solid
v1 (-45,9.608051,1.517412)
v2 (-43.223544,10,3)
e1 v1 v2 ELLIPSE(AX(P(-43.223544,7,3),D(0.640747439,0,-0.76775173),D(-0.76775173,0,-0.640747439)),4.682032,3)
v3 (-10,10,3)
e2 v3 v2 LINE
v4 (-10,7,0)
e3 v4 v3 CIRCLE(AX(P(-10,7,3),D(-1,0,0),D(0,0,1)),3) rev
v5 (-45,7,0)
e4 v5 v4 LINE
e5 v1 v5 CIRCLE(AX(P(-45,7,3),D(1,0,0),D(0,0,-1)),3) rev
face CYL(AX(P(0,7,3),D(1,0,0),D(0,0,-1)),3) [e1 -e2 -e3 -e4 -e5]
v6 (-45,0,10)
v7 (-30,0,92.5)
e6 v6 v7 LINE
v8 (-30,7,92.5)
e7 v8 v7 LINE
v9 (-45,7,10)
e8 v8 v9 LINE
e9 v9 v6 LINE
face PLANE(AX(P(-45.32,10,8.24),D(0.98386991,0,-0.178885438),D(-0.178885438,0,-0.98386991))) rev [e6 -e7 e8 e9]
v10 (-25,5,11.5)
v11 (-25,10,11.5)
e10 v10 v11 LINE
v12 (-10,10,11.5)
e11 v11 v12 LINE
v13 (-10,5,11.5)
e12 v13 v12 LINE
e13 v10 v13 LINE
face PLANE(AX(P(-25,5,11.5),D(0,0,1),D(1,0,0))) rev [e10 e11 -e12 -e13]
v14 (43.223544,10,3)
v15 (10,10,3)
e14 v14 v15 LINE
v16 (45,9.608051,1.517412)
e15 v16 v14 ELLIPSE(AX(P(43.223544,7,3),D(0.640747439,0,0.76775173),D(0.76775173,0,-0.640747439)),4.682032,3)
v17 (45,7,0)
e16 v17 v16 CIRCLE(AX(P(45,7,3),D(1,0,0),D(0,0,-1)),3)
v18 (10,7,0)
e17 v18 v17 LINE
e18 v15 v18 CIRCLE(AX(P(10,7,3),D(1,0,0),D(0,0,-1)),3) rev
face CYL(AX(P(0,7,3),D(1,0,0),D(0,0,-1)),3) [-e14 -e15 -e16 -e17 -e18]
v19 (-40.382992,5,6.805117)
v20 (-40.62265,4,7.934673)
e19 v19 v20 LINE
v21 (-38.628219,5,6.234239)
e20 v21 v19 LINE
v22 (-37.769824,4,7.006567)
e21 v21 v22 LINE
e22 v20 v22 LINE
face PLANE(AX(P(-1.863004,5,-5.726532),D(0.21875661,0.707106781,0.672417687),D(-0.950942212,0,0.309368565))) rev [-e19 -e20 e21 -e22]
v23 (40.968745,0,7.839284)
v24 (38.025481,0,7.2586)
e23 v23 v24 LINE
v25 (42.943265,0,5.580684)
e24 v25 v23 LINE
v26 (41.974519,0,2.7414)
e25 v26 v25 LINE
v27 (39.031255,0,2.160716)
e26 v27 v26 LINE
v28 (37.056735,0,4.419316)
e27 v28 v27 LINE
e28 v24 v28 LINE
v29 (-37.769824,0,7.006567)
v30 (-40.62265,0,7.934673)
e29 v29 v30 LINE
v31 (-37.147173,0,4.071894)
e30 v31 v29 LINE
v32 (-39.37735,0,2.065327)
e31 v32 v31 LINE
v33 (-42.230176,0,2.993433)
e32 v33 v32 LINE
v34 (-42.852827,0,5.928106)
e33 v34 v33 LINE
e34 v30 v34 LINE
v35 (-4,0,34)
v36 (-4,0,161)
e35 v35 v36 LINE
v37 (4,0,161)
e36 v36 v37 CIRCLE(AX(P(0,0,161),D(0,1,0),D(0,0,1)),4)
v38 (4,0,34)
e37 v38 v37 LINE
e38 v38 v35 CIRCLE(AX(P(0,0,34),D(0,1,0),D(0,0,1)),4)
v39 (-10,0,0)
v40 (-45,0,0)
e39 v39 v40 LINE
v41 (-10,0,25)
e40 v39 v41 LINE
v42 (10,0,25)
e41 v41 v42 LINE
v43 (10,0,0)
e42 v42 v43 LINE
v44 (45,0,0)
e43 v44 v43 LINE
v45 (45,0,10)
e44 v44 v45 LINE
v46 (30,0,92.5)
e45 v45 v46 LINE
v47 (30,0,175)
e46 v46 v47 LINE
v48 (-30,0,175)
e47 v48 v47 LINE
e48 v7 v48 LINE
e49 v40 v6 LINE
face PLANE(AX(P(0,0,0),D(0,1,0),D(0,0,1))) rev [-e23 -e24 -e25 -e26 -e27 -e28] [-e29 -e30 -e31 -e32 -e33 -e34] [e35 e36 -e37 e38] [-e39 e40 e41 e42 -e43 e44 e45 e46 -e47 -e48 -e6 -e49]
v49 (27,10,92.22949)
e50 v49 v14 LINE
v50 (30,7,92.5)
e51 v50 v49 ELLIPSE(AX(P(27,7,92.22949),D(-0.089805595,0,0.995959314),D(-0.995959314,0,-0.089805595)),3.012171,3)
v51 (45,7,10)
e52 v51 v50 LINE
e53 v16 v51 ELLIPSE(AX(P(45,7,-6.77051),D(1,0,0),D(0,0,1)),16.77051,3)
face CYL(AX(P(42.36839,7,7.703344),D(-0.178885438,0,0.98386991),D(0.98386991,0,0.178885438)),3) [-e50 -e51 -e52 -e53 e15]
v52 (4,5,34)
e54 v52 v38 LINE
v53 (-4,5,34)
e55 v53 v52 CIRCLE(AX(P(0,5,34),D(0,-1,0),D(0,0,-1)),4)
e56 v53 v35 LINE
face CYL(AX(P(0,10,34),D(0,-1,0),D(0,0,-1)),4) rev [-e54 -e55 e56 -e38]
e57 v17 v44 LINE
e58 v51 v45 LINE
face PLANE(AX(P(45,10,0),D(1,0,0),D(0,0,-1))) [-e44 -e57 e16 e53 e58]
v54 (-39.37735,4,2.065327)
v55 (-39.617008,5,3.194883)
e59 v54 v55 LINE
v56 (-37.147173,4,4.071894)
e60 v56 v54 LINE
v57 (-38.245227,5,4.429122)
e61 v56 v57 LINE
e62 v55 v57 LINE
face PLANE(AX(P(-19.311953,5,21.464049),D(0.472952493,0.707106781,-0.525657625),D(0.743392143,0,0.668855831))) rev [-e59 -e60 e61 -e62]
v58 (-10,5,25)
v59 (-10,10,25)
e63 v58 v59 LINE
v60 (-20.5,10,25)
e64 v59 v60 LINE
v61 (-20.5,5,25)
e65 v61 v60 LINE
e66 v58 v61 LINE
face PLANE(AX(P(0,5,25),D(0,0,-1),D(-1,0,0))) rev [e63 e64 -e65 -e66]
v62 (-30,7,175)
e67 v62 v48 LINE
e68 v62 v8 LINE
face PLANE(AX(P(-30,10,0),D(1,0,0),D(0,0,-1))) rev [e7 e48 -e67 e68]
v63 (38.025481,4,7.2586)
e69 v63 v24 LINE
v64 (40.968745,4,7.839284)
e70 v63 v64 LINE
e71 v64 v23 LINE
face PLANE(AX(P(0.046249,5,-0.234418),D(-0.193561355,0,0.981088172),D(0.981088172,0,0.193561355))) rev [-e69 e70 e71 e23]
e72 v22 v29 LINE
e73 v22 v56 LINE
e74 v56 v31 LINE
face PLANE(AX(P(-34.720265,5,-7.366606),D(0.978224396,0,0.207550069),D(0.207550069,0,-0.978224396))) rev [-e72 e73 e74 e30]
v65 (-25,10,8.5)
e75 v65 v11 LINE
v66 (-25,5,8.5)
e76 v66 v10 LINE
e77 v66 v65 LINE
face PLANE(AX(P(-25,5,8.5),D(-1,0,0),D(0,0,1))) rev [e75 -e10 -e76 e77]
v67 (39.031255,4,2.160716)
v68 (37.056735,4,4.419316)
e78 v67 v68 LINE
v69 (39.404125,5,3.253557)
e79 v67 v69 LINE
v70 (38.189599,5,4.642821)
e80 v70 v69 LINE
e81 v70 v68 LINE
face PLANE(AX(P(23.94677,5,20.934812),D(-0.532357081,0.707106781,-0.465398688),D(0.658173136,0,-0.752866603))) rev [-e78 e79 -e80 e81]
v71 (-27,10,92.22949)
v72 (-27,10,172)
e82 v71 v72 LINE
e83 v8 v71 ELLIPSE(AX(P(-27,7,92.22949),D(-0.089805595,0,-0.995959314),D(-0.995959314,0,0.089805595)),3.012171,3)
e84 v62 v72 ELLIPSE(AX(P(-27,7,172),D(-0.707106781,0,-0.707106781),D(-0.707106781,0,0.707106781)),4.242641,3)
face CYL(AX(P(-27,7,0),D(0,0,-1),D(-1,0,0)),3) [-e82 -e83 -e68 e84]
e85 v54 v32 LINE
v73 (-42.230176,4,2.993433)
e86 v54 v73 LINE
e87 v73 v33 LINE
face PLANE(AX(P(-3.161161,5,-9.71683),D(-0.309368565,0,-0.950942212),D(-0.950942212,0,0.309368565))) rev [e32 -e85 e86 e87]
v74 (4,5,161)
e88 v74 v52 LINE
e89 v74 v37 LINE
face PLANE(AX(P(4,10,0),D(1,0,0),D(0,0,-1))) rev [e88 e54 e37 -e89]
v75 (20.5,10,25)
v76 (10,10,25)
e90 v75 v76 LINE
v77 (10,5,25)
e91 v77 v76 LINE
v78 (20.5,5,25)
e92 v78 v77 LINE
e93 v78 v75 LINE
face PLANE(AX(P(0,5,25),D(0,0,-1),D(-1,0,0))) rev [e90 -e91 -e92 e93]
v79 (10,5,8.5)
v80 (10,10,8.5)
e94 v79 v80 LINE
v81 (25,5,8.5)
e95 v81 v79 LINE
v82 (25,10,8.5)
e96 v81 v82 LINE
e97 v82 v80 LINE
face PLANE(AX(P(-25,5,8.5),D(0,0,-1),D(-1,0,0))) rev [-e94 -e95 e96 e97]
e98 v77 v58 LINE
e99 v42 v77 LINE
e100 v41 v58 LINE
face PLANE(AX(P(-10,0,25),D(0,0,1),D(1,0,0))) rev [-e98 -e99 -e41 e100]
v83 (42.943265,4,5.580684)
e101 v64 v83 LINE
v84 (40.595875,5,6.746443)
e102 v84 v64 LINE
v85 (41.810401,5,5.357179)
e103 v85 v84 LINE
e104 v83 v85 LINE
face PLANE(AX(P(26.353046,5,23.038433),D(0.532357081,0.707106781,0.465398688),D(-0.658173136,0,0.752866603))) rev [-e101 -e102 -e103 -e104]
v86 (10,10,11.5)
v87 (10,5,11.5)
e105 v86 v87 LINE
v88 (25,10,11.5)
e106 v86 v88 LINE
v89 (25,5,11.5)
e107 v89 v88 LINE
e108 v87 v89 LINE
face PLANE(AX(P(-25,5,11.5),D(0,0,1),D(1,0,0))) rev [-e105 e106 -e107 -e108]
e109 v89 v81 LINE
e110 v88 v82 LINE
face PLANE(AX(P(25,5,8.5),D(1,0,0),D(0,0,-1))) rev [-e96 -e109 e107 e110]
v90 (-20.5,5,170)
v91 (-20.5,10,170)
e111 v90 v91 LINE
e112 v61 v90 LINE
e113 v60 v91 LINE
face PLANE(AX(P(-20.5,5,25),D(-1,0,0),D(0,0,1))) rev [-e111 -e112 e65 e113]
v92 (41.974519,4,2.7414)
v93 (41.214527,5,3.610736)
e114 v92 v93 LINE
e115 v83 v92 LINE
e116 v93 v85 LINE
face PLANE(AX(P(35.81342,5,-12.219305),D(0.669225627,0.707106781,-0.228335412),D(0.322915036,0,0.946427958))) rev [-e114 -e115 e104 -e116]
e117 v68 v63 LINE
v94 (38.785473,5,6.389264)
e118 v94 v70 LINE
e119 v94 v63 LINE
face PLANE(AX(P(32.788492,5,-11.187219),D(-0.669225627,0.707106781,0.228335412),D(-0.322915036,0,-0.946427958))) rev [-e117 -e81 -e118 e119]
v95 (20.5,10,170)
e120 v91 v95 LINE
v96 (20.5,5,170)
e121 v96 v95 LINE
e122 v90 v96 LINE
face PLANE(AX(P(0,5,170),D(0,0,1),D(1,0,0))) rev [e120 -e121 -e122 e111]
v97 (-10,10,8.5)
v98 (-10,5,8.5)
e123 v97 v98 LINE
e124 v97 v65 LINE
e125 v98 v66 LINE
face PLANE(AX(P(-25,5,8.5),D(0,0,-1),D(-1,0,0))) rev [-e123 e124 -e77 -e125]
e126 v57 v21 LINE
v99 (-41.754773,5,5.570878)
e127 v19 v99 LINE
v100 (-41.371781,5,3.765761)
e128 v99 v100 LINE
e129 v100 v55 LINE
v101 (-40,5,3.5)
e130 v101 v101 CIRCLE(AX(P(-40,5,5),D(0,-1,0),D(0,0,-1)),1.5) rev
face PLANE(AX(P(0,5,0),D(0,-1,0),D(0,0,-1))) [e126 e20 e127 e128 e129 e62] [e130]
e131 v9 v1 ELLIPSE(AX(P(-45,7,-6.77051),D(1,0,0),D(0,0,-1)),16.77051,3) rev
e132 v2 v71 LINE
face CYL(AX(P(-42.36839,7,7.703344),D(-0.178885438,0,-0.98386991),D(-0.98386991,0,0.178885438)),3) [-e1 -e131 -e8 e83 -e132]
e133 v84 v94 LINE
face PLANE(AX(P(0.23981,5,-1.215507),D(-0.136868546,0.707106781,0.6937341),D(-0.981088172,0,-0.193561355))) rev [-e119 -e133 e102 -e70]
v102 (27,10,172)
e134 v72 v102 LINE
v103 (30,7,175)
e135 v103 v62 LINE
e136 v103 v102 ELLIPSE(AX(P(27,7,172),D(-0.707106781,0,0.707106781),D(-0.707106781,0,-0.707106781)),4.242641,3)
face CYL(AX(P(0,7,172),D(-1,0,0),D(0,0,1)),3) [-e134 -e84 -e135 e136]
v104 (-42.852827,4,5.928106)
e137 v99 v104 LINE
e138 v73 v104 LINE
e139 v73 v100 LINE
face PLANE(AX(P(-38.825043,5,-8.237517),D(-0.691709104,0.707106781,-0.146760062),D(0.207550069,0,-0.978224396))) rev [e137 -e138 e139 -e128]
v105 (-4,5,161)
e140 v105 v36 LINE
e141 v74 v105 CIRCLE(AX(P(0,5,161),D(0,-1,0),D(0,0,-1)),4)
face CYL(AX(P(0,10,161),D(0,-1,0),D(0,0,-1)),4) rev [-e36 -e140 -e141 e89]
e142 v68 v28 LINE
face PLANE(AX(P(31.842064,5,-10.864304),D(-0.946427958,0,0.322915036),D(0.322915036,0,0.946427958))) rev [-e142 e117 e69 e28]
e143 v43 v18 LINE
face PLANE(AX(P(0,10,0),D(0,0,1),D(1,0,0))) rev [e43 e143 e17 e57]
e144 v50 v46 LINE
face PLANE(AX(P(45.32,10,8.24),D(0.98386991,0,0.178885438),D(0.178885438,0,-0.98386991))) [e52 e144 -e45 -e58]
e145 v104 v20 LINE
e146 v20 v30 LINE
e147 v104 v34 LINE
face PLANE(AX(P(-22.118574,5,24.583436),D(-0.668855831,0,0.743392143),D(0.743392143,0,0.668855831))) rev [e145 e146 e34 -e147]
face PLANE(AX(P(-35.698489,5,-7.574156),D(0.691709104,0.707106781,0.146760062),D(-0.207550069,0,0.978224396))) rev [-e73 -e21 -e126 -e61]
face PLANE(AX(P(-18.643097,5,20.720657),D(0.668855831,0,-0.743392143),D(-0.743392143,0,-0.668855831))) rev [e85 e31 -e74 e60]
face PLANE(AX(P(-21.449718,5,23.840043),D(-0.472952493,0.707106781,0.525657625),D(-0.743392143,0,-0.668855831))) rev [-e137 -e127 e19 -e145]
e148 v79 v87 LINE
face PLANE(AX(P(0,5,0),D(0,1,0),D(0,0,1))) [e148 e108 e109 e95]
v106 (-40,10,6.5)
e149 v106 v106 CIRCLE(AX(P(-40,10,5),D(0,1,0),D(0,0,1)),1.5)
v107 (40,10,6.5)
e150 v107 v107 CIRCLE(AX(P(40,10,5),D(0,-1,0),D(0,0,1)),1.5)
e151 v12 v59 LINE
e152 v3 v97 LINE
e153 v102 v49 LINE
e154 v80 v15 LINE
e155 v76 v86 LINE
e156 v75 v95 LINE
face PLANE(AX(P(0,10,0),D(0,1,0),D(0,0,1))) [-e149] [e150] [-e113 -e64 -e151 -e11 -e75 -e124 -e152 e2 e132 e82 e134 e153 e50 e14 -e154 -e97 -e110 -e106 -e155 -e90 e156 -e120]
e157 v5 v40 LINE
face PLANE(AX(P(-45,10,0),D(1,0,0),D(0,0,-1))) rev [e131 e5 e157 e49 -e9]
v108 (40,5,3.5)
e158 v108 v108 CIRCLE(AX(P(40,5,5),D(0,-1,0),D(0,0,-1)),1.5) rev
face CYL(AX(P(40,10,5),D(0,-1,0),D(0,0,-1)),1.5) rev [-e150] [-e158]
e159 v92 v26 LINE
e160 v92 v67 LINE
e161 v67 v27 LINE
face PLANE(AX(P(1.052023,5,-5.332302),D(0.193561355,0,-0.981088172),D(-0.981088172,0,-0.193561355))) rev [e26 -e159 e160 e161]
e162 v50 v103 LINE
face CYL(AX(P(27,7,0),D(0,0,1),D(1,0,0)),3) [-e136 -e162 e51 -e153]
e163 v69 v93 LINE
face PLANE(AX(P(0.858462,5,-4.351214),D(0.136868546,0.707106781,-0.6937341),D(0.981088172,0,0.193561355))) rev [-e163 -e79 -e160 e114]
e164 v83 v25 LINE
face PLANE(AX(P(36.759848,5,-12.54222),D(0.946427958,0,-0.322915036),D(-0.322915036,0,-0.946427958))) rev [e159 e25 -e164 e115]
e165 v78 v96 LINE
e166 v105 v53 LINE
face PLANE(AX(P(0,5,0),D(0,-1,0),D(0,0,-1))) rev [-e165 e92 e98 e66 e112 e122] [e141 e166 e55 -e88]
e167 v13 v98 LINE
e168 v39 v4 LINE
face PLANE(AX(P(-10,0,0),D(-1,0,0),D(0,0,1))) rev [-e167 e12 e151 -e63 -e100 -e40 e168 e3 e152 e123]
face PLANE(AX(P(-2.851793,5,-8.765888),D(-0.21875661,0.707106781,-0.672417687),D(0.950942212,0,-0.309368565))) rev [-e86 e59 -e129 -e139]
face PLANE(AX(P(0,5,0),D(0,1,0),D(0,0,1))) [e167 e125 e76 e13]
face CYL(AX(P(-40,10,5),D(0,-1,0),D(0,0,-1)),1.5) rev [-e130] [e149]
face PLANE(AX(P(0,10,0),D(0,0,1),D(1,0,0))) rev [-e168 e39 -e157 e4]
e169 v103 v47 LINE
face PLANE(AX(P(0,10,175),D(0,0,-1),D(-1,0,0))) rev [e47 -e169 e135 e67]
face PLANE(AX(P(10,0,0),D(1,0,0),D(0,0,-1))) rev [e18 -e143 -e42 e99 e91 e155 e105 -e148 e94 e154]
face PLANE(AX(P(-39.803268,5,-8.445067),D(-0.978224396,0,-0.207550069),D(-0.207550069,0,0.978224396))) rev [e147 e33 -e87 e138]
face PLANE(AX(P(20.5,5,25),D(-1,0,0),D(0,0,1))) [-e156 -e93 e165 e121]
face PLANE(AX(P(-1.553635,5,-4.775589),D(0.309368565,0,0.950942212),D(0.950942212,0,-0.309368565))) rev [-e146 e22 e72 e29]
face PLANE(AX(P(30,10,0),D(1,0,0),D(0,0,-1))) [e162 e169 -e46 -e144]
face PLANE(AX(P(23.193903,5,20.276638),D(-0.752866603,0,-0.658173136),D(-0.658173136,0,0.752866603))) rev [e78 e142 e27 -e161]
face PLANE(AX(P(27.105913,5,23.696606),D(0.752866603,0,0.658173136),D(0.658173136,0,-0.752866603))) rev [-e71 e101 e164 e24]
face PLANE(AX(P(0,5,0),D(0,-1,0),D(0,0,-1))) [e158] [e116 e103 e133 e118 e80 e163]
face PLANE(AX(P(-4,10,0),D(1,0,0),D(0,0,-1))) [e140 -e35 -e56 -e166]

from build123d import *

# Parameters (mm, degrees)
SKETCH1_R           = 1.5
BOSS_EXTRUDE1_DEPTH = 10
SKETCH2_W           = 20.5
SKETCH2_H           = 145
CUT_EXTRUDE1_DEPTH  = 5
SKETCH3_W           = 20
SKETCH3_H           = 25
CUT_EXTRUDE2_DEPTH  = 181.969610709
SKETCH4_W           = 50
SKETCH4_H           = 3
CUT_EXTRUDE3_DEPTH  = 5
FILLET1_R           = 3
SKETCH6_R           = 1.5
CUT_EXTRUDE4_DEPTH  = 5
CHAMFER2_SIZE       = 1


with BuildPart() as part:
    # Sketch1 → Boss-Extrude1 (new body)
    with BuildSketch(Plane(origin=(0, 0, 0), x_dir=(1, 0, 0), z_dir=(0, 1, 0))):
        with BuildLine():
            Line((0, -30), (0, 0))
            Line((0, 0), (-45, 0))
            Line((-45, 0), (-45, -10))
            Line((-45, -10), (-30, -92.5))
            Line((-30, -92.5), (-30, -175))
            Line((-30, -175), (0, -175))
            Line((0, -175), (0, -165))
            ThreePointArc((0, -165), (-2.828427125, -163.828427125), (-4, -161))
            Line((-4, -161), (-4, -34))
            ThreePointArc((-4, -34), (-2.828427125, -31.171572875), (0, -30))
        make_face()
        with Locations(Location((-40, -5, 0), (0, 0, 270))):
            Circle(SKETCH1_R, mode=Mode.SUBTRACT)
    boss_extrude1 = extrude(amount=BOSS_EXTRUDE1_DEPTH)

    # Sketch2 → Cut-Extrude1 (cut)
    with BuildSketch(Plane(origin=(0, 10, 0), x_dir=(1, 0, 0), z_dir=(0, 1, 0))):
        with Locations((-10.25, -97.5)):
            Rectangle(SKETCH2_W, SKETCH2_H)
    cut_extrude1 = extrude(amount=-CUT_EXTRUDE1_DEPTH, mode=Mode.SUBTRACT)

    # Mirror1: Boss-Extrude1, Cut-Extrude1 across plane
    add(boss_extrude1.mirror(Plane(origin=(0, 0, 0), x_dir=(0, 0, 1), z_dir=(1, 0, 0))))
    add(cut_extrude1.mirror(Plane(origin=(0, 0, 0), x_dir=(0, 0, 1), z_dir=(1, 0, 0))), mode=Mode.SUBTRACT)

    # Sketch3 → Cut-Extrude2 (cut, through all)
    with BuildSketch(Plane(origin=(0, 10, 0), x_dir=(1, 0, 0), z_dir=(0, 1, 0))):
        with Locations((0, -12.5)):
            Rectangle(SKETCH3_W, SKETCH3_H)
    extrude(amount=-CUT_EXTRUDE2_DEPTH, mode=Mode.SUBTRACT)

    # Sketch4 → Cut-Extrude3 (cut)
    with BuildSketch(Plane(origin=(0, 10, 0), x_dir=(1, 0, 0), z_dir=(0, 1, 0))):
        with Locations((0, -10)):
            Rectangle(SKETCH4_W, SKETCH4_H)
    extrude(amount=-CUT_EXTRUDE3_DEPTH, mode=Mode.SUBTRACT)

    # Fillet1
    # the kernel refuses this fillet: 3 mm, written as the material it takes off along each edge
    with BuildSketch(Plane(origin=(-63, 10, 0), x_dir=(0, -1, 0), z_dir=(1, 0, 0)), Plane(origin=(-8, 10, 0), x_dir=(0, -1, 0), z_dir=(1, 0, 0))) as fillet1_piece_1:
        with BuildLine():
            CenterArc((FILLET1_R, -FILLET1_R), FILLET1_R, 90, 90)
            Line((0, -FILLET1_R), (-FILLET1_R * 0.02, -FILLET1_R))
            Line((-FILLET1_R * 0.02, -FILLET1_R), (-FILLET1_R * 0.02, FILLET1_R * 0.02))
            Line((-FILLET1_R * 0.02, FILLET1_R * 0.02), (FILLET1_R, FILLET1_R * 0.02))
            Line((FILLET1_R, FILLET1_R * 0.02), (FILLET1_R, 0))
        make_face()
    extrude(amount=71, mode=Mode.SUBTRACT)
    with BuildSketch(Plane(origin=(-48.219937888, 10, -7.709658382), x_dir=(0, -1, 0), z_dir=(0.1788854381999831, 0, 0.9838699100999075))) as fillet1_piece_2_section:
        with BuildLine():
            CenterArc((FILLET1_R, FILLET1_R), FILLET1_R, 180, 90)
            Line((0, FILLET1_R), (-FILLET1_R * 0.02, FILLET1_R))
            Line((-FILLET1_R * 0.02, FILLET1_R), (-FILLET1_R * 0.02, -FILLET1_R * 0.02))
            Line((-FILLET1_R * 0.02, -FILLET1_R * 0.02), (FILLET1_R, -FILLET1_R * 0.02))
            Line((FILLET1_R, -FILLET1_R * 0.02), (FILLET1_R, 0))
        make_face()
    fillet1_piece_2 = extrude(amount=119.852549156, mode=Mode.PRIVATE)
    fillet1_piece_2 = split(fillet1_piece_2, bisect_by=Plane(origin=(-30, 9.306962758, 40.50367668), z_dir=(-1, 0, 0)), keep=Keep.TOP, mode=Mode.PRIVATE)
    add(fillet1_piece_2, mode=Mode.SUBTRACT)
    with BuildSketch(Plane(origin=(-30, 10, 74.5), x_dir=(0, -1, 0), z_dir=(0, 0, 1))) as fillet1_piece_3_section:
        with BuildLine():
            CenterArc((FILLET1_R, FILLET1_R), FILLET1_R, 180, 90)
            Line((0, FILLET1_R), (-FILLET1_R * 0.02, FILLET1_R))
            Line((-FILLET1_R * 0.02, FILLET1_R), (-FILLET1_R * 0.02, -FILLET1_R * 0.02))
            Line((-FILLET1_R * 0.02, -FILLET1_R * 0.02), (FILLET1_R, -FILLET1_R * 0.02))
            Line((FILLET1_R, -FILLET1_R * 0.02), (FILLET1_R, 0))
        make_face()
    fillet1_piece_3 = extrude(amount=118.5, mode=Mode.PRIVATE)
    fillet1_piece_3 = split(fillet1_piece_3, bisect_by=Plane(origin=(-20.817808359, 9.30676914, 143.002054026), z_dir=(-0.9838699100999075, 0, 0.1788854381999831)), keep=Keep.TOP, mode=Mode.PRIVATE)
    add(fillet1_piece_3, mode=Mode.SUBTRACT)
    with BuildSketch(Plane(origin=(48, 10, 175), x_dir=(0, -1, 0), z_dir=(-1, 0, 0))) as fillet1_piece_4:
        with BuildLine():
            CenterArc((FILLET1_R, -FILLET1_R), FILLET1_R, 90, 90)
            Line((0, -FILLET1_R), (-FILLET1_R * 0.02, -FILLET1_R))
            Line((-FILLET1_R * 0.02, -FILLET1_R), (-FILLET1_R * 0.02, FILLET1_R * 0.02))
            Line((-FILLET1_R * 0.02, FILLET1_R * 0.02), (FILLET1_R, FILLET1_R * 0.02))
            Line((FILLET1_R, FILLET1_R * 0.02), (FILLET1_R, 0))
        make_face()
    extrude(amount=96, mode=Mode.SUBTRACT)
    with BuildSketch(Plane(origin=(30, 10, 74.5), x_dir=(0, -1, 0), z_dir=(0, 0, 1))) as fillet1_piece_5_section:
        with BuildLine():
            CenterArc((FILLET1_R, -FILLET1_R), FILLET1_R, 90, 90)
            Line((0, -FILLET1_R), (-FILLET1_R * 0.02, -FILLET1_R))
            Line((-FILLET1_R * 0.02, -FILLET1_R), (-FILLET1_R * 0.02, FILLET1_R * 0.02))
            Line((-FILLET1_R * 0.02, FILLET1_R * 0.02), (FILLET1_R, FILLET1_R * 0.02))
            Line((FILLET1_R, FILLET1_R * 0.02), (FILLET1_R, 0))
        make_face()
    fillet1_piece_5 = extrude(amount=118.5, mode=Mode.PRIVATE)
    fillet1_piece_5 = split(fillet1_piece_5, bisect_by=Plane(origin=(20.817808359, 9.30676914, 143.002054026), z_dir=(0.9838699100999075, 0, 0.1788854381999831)), keep=Keep.TOP, mode=Mode.PRIVATE)
    add(fillet1_piece_5, mode=Mode.SUBTRACT)
    with BuildSketch(Plane(origin=(48.219937888, 10, -7.709658382), x_dir=(0, -1, 0), z_dir=(-0.1788854381999831, 0, 0.9838699100999075))) as fillet1_piece_6_section:
        with BuildLine():
            CenterArc((FILLET1_R, -FILLET1_R), FILLET1_R, 90, 90)
            Line((0, -FILLET1_R), (-FILLET1_R * 0.02, -FILLET1_R))
            Line((-FILLET1_R * 0.02, -FILLET1_R), (-FILLET1_R * 0.02, FILLET1_R * 0.02))
            Line((-FILLET1_R * 0.02, FILLET1_R * 0.02), (FILLET1_R, FILLET1_R * 0.02))
            Line((FILLET1_R, FILLET1_R * 0.02), (FILLET1_R, 0))
        make_face()
    fillet1_piece_6 = extrude(amount=119.852549156, mode=Mode.PRIVATE)
    fillet1_piece_6 = split(fillet1_piece_6, bisect_by=Plane(origin=(30, 9.306962758, 40.50367668), z_dir=(1, 0, 0)), keep=Keep.TOP, mode=Mode.PRIVATE)
    add(fillet1_piece_6, mode=Mode.SUBTRACT)
    with BuildSketch(Plane(origin=(-30, 10, 74.5), x_dir=(0, -1, 0), z_dir=(0, 0, 1))) as fillet1_piece_7a_section:
        with BuildLine():
            CenterArc((FILLET1_R, FILLET1_R), FILLET1_R, 180, 90)
            Line((0, FILLET1_R), (-FILLET1_R * 0.02, FILLET1_R))
            Line((-FILLET1_R * 0.02, FILLET1_R), (-FILLET1_R * 0.02, -FILLET1_R * 0.02))
            Line((-FILLET1_R * 0.02, -FILLET1_R * 0.02), (FILLET1_R, -FILLET1_R * 0.02))
            Line((FILLET1_R, -FILLET1_R * 0.02), (FILLET1_R, 0))
        make_face()
    fillet1_piece_7a = extrude(amount=118.5, mode=Mode.PRIVATE)
    fillet1_piece_7a = split(fillet1_piece_7a, bisect_by=Plane(origin=(-31.178924404, 9.383343973, 86.015915779), z_dir=(0.9838699100999075, 0, -0.1788854381999831)), keep=Keep.TOP, mode=Mode.PRIVATE)
    with BuildSketch(Plane(origin=(-48.219937888, 10, -7.709658382), x_dir=(0, -1, 0), z_dir=(0.1788854381999831, 0, 0.9838699100999075))) as fillet1_piece_7b_section:
        with BuildLine():
            CenterArc((FILLET1_R, FILLET1_R), FILLET1_R, 180, 90)
            Line((0, FILLET1_R), (-FILLET1_R * 0.02, FILLET1_R))
            Line((-FILLET1_R * 0.02, FILLET1_R), (-FILLET1_R * 0.02, -FILLET1_R * 0.02))
            Line((-FILLET1_R * 0.02, -FILLET1_R * 0.02), (FILLET1_R, -FILLET1_R * 0.02))
            Line((FILLET1_R, -FILLET1_R * 0.02), (FILLET1_R, 0))
        make_face()
    fillet1_piece_7b = extrude(amount=119.852549156, mode=Mode.PRIVATE)
    fillet1_piece_7b = split(fillet1_piece_7b, bisect_by=Plane(origin=(-30, 9.383343973, 99.090387768), z_dir=(1, 0, 0)), keep=Keep.TOP, mode=Mode.PRIVATE)
    fillet1_piece_7 = fillet1_piece_7a & fillet1_piece_7b
    add(fillet1_piece_7, mode=Mode.SUBTRACT)
    with BuildSketch(Plane(origin=(48.219937888, 10, -7.709658382), x_dir=(0, -1, 0), z_dir=(-0.1788854381999831, 0, 0.9838699100999075))) as fillet1_piece_8a_section:
        with BuildLine():
            CenterArc((FILLET1_R, -FILLET1_R), FILLET1_R, 90, 90)
            Line((0, -FILLET1_R), (-FILLET1_R * 0.02, -FILLET1_R))
            Line((-FILLET1_R * 0.02, -FILLET1_R), (-FILLET1_R * 0.02, FILLET1_R * 0.02))
            Line((-FILLET1_R * 0.02, FILLET1_R * 0.02), (FILLET1_R, FILLET1_R * 0.02))
            Line((FILLET1_R, FILLET1_R * 0.02), (FILLET1_R, 0))
        make_face()
    fillet1_piece_8a = extrude(amount=119.852549156, mode=Mode.PRIVATE)
    fillet1_piece_8a = split(fillet1_piece_8a, bisect_by=Plane(origin=(30, 9.383343973, 99.090387768), z_dir=(-1, 0, 0)), keep=Keep.TOP, mode=Mode.PRIVATE)
    with BuildSketch(Plane(origin=(30, 10, 74.5), x_dir=(0, -1, 0), z_dir=(0, 0, 1))) as fillet1_piece_8b_section:
        with BuildLine():
            CenterArc((FILLET1_R, -FILLET1_R), FILLET1_R, 90, 90)
            Line((0, -FILLET1_R), (-FILLET1_R * 0.02, -FILLET1_R))
            Line((-FILLET1_R * 0.02, -FILLET1_R), (-FILLET1_R * 0.02, FILLET1_R * 0.02))
            Line((-FILLET1_R * 0.02, FILLET1_R * 0.02), (FILLET1_R, FILLET1_R * 0.02))
            Line((FILLET1_R, FILLET1_R * 0.02), (FILLET1_R, 0))
        make_face()
    fillet1_piece_8b = extrude(amount=118.5, mode=Mode.PRIVATE)
    fillet1_piece_8b = split(fillet1_piece_8b, bisect_by=Plane(origin=(31.178924404, 9.383343973, 86.015915779), z_dir=(-0.9838699100999075, 0, -0.1788854381999831)), keep=Keep.TOP, mode=Mode.PRIVATE)
    fillet1_piece_8 = fillet1_piece_8a & fillet1_piece_8b
    add(fillet1_piece_8, mode=Mode.SUBTRACT)

    # Sketch6 → Cut-Extrude4 (cut)
    # profile 1 of 2: a face of its own
    with BuildSketch(Plane.XZ):
        Polygon((-42.230176428, 2.993432508), (-39.377349792, 2.065326812), (-37.147173364, 4.071894304), (-37.769823572, 7.006567492), (-40.622650208, 7.934673188), (-42.852826636, 5.928105696), align=None)
        with Locations(Location((-40, 5, 0), (0, 0, 270))):
            Circle(SKETCH6_R, mode=Mode.SUBTRACT)
    # profile 2 of 2: a face of its own
    with BuildSketch(Plane.XZ):
        Polygon((37.056735483, 4.419315936), (39.031254892, 2.160716126), (41.974519409, 2.74140019), (42.943264517, 5.580684064), (40.968745108, 7.839283874), (38.025480591, 7.25859981), align=None)
        with Locations(Location((40, 5, 0), (0, 0, 270))):
            Circle(SKETCH6_R, mode=Mode.SUBTRACT)
    extrude(amount=-CUT_EXTRUDE4_DEPTH, mode=Mode.SUBTRACT)

    # Chamfer2
    chamfer2_edges = [part.edges().sort_by_distance(p)[0] for p in [
        (-40.80376311, 5, 2.52937966),
        (-42.541501532, 5, 4.460769102),
        (-41.737738422, 5, 6.931389442),
        (-39.19623689, 5, 7.47062034),
        (-37.458498468, 5, 5.539230898),
        (-38.262261578, 5, 3.068610558),
        (38.043995187, 5, 3.290016031),
        (37.541108037, 5, 5.838957873),
        (39.497112849, 5, 7.548941842),
        (41.956004813, 5, 6.709983969),
        (42.458891963, 5, 4.161042127),
        (40.502887151, 5, 2.451058158),
    ]]
    chamfer(chamfer2_edges, length=CHAMFER2_SIZE)


solid = part.part
